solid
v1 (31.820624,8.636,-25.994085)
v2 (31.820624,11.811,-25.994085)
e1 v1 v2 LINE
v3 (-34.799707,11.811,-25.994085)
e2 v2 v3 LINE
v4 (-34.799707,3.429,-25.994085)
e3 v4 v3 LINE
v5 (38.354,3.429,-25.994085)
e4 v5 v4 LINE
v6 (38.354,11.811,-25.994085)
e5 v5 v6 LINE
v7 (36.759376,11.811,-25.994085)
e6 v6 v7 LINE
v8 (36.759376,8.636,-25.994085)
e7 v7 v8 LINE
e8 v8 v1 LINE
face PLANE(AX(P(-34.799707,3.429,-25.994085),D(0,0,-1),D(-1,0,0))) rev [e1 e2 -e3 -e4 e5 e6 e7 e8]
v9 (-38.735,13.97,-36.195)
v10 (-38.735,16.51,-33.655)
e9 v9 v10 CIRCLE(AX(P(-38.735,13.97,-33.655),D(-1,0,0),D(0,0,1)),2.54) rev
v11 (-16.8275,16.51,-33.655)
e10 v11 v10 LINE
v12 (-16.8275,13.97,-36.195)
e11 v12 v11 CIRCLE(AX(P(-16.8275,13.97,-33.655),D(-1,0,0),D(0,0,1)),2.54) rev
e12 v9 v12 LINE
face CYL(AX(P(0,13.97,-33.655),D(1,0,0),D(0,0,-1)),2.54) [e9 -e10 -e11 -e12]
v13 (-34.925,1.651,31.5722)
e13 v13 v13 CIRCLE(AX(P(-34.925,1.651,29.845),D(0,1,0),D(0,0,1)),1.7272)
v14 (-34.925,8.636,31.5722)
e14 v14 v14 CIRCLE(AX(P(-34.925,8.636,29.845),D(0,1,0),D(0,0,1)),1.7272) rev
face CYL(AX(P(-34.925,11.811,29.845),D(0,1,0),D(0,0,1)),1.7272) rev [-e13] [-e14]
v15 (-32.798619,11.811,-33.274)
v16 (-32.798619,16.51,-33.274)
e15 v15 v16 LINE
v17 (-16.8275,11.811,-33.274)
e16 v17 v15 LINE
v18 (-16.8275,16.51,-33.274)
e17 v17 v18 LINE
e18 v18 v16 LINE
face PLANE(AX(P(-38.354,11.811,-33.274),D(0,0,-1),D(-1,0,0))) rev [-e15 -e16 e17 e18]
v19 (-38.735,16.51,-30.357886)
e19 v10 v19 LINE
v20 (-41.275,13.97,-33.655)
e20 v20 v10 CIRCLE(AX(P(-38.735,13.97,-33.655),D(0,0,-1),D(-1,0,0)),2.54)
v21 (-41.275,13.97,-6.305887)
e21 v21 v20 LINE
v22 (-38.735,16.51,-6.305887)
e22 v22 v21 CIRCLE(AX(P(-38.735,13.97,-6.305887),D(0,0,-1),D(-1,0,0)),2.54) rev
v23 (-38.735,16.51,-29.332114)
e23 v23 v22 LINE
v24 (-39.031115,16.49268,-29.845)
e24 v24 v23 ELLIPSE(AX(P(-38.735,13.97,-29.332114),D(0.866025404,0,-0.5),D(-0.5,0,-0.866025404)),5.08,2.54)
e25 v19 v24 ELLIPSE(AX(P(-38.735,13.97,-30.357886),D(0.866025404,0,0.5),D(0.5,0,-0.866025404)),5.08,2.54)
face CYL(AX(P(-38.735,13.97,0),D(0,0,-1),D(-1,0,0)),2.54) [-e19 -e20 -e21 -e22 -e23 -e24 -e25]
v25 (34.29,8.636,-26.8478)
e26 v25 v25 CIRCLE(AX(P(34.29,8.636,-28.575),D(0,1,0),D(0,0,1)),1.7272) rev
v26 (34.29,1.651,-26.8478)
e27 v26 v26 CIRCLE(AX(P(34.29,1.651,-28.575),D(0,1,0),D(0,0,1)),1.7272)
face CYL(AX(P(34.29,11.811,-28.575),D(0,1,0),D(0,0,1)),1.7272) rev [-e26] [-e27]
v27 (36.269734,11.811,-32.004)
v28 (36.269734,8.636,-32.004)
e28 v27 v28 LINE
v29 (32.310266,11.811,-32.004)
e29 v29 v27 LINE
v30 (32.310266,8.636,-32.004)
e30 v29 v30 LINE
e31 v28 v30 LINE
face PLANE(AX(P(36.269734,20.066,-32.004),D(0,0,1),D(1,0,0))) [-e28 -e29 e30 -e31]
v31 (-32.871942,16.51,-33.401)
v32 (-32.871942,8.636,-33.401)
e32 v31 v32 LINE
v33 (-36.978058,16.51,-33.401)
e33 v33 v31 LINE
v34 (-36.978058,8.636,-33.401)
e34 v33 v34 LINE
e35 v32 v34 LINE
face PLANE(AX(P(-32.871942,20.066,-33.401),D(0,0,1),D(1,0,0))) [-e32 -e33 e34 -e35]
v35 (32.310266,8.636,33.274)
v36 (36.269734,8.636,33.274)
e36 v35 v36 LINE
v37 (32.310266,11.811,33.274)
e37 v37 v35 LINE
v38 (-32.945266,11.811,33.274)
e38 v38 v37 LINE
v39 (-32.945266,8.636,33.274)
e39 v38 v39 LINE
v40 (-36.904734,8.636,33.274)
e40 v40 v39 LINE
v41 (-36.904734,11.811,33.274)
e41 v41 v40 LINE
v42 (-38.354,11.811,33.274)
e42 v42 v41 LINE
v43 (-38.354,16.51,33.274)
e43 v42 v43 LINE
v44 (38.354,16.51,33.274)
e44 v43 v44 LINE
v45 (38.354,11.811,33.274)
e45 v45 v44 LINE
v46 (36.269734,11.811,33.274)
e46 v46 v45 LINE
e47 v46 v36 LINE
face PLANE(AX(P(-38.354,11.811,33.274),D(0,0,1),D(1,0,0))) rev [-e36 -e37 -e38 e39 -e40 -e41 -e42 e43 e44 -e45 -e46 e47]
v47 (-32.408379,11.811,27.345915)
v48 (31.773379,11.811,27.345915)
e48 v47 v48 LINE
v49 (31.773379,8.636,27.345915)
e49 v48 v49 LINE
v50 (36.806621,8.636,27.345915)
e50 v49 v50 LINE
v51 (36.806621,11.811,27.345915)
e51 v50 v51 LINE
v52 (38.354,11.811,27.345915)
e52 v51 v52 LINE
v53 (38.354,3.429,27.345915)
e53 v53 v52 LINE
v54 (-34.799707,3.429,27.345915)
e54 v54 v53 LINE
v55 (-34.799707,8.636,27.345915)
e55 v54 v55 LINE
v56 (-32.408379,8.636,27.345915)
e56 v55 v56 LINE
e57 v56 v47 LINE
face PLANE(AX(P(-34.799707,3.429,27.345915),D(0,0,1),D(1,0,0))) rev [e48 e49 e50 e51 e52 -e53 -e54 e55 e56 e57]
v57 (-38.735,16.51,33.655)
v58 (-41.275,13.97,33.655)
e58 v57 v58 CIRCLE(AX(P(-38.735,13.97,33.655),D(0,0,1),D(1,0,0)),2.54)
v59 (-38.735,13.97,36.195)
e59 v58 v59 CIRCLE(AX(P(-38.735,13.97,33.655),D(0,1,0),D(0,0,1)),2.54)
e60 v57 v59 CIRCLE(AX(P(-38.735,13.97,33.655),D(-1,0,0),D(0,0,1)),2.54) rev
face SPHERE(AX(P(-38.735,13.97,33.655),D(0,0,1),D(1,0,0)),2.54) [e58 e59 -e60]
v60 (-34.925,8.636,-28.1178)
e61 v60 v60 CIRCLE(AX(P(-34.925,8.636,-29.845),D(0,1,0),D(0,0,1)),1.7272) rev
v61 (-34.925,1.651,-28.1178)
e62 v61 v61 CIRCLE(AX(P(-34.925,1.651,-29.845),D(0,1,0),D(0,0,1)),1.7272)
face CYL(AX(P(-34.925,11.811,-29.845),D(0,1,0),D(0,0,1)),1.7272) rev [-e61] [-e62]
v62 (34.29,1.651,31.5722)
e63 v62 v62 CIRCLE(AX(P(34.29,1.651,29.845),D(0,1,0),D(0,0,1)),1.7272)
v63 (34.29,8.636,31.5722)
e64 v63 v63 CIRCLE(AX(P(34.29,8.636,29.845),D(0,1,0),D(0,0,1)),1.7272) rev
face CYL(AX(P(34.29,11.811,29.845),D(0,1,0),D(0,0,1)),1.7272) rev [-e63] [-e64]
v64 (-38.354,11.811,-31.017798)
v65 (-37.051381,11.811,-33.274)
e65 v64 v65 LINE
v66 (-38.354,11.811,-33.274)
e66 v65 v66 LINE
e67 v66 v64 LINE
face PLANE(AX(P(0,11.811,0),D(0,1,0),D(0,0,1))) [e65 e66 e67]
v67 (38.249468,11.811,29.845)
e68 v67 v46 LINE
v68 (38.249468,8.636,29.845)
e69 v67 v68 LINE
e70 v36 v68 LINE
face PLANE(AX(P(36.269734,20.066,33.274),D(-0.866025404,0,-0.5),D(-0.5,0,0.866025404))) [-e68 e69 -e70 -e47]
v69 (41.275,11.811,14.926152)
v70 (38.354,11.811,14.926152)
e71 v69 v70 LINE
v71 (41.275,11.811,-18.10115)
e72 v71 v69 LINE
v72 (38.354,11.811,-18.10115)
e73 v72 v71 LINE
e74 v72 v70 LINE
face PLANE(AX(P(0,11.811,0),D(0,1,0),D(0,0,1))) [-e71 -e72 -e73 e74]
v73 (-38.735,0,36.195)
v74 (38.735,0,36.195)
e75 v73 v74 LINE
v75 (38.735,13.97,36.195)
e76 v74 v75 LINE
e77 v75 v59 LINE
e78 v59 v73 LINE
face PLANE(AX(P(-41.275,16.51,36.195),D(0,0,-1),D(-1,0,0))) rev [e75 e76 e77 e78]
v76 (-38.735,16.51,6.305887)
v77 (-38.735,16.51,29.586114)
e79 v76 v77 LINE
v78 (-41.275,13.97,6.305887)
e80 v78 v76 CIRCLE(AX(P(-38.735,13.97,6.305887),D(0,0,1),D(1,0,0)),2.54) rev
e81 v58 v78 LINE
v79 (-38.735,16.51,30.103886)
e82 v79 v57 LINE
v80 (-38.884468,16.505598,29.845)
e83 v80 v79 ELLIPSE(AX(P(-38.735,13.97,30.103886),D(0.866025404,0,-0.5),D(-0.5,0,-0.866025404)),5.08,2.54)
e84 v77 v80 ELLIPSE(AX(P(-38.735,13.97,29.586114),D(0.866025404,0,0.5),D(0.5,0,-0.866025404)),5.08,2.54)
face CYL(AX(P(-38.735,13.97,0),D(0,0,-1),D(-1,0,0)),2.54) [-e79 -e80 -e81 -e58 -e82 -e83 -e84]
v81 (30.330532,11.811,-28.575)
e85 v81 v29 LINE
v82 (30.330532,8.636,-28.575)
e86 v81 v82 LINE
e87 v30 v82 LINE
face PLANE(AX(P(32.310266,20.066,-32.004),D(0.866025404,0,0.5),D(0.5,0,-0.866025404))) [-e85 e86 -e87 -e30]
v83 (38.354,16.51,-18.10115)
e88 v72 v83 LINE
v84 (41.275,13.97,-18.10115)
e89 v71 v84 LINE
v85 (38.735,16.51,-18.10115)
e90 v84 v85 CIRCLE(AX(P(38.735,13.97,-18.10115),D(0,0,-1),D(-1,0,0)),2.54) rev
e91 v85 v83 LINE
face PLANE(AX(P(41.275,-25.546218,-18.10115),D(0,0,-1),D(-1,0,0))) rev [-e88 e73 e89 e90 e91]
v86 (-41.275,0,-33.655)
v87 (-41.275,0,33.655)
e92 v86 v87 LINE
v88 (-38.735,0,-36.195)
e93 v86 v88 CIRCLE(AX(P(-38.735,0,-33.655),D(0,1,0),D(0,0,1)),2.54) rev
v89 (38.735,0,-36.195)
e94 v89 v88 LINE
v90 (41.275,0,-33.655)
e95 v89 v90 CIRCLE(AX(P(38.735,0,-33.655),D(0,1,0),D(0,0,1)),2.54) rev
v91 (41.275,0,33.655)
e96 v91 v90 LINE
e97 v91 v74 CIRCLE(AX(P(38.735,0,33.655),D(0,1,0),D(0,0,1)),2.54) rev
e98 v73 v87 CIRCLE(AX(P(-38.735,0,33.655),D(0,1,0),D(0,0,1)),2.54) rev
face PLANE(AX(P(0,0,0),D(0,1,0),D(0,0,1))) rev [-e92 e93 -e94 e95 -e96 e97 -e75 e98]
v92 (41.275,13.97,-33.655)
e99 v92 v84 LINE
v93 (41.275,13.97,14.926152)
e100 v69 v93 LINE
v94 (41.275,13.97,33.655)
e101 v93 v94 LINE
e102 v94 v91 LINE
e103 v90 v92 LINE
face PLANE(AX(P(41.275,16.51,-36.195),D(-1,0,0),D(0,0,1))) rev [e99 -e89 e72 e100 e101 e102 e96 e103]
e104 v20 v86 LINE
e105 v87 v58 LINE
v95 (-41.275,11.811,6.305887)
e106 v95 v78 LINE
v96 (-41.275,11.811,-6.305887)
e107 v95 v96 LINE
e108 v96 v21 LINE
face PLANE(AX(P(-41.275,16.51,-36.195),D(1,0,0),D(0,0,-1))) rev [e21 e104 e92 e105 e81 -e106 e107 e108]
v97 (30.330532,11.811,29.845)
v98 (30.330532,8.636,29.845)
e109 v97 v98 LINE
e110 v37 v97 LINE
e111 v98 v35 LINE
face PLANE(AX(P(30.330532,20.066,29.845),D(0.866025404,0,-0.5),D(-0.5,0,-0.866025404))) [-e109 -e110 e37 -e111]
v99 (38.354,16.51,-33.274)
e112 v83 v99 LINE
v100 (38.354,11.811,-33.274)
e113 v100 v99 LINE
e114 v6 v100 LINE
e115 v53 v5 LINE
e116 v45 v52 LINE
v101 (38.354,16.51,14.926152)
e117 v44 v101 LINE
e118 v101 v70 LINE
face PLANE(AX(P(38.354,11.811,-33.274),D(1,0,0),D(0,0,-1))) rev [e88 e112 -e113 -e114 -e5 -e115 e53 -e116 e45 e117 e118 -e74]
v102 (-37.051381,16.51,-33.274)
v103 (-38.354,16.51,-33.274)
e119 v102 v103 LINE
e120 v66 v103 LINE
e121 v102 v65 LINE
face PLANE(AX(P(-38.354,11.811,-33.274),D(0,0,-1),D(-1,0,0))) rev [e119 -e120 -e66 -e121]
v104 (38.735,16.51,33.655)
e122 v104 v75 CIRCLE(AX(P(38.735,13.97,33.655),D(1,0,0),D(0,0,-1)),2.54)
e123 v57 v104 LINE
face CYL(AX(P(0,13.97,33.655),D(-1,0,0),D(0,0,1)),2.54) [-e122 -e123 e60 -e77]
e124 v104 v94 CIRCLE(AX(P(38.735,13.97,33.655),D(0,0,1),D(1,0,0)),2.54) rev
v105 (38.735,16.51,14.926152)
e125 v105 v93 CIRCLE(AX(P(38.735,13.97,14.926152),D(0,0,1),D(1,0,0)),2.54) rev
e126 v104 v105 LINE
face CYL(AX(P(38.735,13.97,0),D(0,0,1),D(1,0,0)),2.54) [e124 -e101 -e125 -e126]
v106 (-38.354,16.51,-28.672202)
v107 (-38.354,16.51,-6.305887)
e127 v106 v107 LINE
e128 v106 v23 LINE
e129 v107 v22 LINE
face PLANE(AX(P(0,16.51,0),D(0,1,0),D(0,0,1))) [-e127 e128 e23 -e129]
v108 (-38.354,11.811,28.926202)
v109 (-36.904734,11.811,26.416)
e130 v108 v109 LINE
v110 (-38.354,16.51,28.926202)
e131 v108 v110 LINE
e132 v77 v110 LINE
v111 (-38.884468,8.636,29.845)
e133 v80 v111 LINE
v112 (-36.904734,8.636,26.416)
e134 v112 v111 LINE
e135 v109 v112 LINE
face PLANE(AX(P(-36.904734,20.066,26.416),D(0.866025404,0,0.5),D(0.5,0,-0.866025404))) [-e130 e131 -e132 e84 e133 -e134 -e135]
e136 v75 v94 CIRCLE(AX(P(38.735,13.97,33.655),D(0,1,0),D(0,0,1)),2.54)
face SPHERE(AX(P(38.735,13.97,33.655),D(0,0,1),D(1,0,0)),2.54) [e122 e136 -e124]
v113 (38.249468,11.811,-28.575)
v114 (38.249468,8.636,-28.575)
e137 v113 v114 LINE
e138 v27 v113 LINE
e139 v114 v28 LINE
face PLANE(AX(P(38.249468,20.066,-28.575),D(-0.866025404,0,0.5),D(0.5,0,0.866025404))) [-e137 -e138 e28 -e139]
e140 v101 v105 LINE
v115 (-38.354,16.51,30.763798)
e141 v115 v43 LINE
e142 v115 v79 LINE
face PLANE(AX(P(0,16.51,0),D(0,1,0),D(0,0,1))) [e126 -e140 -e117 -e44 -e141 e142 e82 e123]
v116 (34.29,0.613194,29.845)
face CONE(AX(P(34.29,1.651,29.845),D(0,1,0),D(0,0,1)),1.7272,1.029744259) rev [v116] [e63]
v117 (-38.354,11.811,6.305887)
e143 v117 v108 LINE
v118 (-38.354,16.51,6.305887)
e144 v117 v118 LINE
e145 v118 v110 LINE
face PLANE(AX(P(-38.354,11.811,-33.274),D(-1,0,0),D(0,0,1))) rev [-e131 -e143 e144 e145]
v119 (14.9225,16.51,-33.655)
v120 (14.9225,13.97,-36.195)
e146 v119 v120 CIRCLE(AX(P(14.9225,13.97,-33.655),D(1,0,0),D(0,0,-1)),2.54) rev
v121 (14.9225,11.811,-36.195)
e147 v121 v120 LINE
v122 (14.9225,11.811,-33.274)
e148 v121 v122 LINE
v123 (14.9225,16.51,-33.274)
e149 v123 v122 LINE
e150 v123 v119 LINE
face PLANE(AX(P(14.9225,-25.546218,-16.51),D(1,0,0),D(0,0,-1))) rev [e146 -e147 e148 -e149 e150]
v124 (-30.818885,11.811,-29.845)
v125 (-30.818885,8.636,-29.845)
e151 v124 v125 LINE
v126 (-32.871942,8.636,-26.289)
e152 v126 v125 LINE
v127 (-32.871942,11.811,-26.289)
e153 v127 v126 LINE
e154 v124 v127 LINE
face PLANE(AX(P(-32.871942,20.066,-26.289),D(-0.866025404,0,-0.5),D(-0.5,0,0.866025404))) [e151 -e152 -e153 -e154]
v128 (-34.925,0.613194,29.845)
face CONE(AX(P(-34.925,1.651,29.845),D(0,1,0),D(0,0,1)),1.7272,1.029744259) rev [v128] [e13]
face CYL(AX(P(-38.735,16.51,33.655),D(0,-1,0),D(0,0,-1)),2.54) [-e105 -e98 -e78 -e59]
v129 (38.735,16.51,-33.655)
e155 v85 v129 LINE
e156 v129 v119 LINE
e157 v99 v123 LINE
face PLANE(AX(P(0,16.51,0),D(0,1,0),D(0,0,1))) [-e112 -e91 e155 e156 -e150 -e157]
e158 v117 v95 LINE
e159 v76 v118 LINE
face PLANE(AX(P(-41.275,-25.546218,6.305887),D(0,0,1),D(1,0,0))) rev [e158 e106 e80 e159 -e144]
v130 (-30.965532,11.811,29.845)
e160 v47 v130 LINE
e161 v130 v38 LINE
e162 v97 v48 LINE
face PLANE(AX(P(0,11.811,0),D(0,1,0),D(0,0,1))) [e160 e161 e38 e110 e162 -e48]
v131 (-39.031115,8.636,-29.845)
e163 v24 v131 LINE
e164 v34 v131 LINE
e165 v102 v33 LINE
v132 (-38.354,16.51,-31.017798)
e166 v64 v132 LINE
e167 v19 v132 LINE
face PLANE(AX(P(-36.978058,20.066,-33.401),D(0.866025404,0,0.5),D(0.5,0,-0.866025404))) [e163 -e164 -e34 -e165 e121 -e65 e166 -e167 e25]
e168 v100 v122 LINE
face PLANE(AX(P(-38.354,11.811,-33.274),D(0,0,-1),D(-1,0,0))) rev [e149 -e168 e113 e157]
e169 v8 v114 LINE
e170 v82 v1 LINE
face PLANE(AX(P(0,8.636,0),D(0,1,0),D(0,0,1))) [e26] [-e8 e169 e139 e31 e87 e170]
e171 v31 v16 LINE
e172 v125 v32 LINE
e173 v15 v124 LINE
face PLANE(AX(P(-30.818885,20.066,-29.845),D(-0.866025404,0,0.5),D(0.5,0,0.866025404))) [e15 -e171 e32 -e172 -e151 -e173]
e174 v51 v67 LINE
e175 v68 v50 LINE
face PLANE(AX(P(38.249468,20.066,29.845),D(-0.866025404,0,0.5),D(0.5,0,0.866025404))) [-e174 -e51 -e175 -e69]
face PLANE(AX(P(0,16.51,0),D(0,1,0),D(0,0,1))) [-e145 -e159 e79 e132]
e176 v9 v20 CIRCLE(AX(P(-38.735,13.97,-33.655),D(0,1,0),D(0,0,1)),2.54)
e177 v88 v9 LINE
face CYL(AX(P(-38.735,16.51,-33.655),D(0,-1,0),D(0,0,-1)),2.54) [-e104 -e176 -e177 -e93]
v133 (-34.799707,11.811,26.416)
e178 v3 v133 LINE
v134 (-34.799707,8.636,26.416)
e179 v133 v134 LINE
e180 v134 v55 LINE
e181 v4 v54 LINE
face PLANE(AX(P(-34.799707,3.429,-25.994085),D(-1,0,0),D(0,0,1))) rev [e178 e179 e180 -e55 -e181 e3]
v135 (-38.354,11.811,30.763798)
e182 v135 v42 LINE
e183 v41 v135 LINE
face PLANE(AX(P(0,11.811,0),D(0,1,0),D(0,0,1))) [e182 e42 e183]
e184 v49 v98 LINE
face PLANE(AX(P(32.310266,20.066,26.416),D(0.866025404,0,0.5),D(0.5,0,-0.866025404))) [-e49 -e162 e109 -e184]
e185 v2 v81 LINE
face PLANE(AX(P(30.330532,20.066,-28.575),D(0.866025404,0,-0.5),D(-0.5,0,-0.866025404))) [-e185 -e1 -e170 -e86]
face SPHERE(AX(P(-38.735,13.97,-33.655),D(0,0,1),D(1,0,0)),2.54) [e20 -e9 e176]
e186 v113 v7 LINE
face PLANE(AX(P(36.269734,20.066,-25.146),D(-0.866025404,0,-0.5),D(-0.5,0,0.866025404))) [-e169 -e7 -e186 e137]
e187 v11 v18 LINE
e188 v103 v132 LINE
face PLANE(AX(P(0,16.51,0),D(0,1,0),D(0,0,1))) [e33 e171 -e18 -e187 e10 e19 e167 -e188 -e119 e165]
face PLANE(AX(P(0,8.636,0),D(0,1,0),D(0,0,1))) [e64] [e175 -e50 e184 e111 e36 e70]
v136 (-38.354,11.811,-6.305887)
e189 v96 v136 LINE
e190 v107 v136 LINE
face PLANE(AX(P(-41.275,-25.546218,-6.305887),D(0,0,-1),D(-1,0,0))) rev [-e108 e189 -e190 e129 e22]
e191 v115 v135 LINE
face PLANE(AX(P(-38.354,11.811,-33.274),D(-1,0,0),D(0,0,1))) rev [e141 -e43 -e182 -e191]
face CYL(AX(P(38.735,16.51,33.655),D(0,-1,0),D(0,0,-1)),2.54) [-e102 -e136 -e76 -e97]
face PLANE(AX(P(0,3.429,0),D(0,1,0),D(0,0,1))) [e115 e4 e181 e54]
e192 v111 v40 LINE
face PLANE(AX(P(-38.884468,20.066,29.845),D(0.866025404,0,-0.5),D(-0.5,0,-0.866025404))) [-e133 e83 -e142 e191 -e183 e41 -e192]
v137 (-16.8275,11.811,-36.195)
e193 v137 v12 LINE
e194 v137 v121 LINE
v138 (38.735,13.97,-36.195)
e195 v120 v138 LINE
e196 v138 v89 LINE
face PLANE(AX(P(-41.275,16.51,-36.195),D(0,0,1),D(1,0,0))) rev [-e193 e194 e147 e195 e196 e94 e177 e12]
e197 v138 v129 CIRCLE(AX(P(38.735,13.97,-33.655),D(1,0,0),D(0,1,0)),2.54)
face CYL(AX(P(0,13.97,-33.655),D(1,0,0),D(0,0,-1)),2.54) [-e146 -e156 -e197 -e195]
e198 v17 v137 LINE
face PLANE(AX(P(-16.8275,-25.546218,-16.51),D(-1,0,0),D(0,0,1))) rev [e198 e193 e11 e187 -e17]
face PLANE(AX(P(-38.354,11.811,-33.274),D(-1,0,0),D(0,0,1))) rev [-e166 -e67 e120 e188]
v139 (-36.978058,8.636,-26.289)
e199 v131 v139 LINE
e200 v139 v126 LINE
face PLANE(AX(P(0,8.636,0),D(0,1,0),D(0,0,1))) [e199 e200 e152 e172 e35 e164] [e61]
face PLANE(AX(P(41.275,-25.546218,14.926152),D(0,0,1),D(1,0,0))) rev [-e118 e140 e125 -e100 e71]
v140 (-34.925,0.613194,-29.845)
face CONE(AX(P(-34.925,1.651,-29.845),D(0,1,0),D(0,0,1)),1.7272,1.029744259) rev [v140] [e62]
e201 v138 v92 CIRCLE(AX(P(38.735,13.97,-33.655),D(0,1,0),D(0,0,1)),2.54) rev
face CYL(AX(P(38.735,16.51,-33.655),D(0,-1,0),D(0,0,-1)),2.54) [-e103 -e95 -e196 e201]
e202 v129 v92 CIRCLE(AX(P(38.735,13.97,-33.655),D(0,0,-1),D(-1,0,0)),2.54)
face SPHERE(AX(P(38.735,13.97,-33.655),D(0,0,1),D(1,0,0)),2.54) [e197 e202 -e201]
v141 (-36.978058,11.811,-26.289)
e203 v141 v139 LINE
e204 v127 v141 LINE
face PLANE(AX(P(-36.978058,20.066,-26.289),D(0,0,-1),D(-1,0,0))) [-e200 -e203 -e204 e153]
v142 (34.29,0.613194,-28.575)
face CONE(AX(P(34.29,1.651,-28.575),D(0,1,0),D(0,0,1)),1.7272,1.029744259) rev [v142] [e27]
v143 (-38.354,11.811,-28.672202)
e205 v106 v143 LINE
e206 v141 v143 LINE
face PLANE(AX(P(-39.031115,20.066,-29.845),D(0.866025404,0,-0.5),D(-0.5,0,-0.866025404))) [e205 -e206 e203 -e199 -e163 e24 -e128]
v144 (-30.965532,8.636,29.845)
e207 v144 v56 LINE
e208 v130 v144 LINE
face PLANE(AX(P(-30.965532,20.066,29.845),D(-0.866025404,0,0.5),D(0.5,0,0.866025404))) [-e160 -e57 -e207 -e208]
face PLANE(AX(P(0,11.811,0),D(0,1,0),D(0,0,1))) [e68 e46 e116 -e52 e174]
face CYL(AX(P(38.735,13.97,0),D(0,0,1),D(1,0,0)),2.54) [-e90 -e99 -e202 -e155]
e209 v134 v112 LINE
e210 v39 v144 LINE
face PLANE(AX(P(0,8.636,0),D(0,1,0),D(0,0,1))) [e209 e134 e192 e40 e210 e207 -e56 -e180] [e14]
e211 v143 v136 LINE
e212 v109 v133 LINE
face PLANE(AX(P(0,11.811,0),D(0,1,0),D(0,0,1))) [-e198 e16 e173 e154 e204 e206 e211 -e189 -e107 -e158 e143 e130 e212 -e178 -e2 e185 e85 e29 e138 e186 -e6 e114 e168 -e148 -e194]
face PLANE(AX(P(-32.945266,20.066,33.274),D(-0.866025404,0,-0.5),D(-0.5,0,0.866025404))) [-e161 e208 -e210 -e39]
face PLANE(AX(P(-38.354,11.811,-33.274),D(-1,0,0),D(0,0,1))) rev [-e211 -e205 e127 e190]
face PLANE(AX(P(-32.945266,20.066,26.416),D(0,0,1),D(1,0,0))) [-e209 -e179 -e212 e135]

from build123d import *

# Parameters (mm, degrees)
SKETCH1_W                 = 82.55
SKETCH1_H                 = 72.39
BOSS_EXTRUDE1_DEPTH       = 16.51
SKETCH3_W                 = 76.708
SKETCH3_H                 = 66.548
CUT_EXTRUDE1_DEPTH        = 4.699
F_4_CLEARANCE_HOLE1_D     = 3.4544
F_4_CLEARANCE_HOLE1_DEPTH = 10.16
F_4_CLEARANCE_HOLE1_TIP   = 1.037806461
CUT_EXTRUDE2_DEPTH        = 8.255
CUT_EXTRUDE2_DEPTH_BACK   = 3.175
SKETCH9_W                 = 73.153706622
SKETCH9_H                 = 53.34
CUT_EXTRUDE3_DEPTH        = 8.382
SKETCH12_W                = 10.829569732
SKETCH12_H                = 12.611774214
SKETCH12_W_2              = 17.214227743
SKETCH12_H_2              = 33.027302542
SKETCH12_W_3              = 31.75
SKETCH12_H_3              = 19.685
CUT_EXTRUDE8_DEPTH        = 4.699
FILLET1_R                 = 2.54


with BuildPart() as part:
    # Sketch1 → Boss-Extrude1 (new body)
    with BuildSketch(Plane(origin=(0, 0, 0), x_dir=(1, 0, 0), z_dir=(0, 1, 0))):
        Rectangle(SKETCH1_W, SKETCH1_H)
    extrude(amount=BOSS_EXTRUDE1_DEPTH)

    # Sketch3 → Cut-Extrude1 (cut)
    with BuildSketch(Plane(origin=(0, 16.51, 0), x_dir=(1, 0, 0), z_dir=(0, 1, 0))):
        Rectangle(SKETCH3_W, SKETCH3_H)
    extrude(amount=-CUT_EXTRUDE1_DEPTH, mode=Mode.SUBTRACT)

    # #4 Clearance Hole1
    with Locations(Plane(origin=(0, 11.811, 0), x_dir=(1, 0, 0), z_dir=(0, 1, 0))):
        with Locations((-34.925, 29.845), (34.29, 28.575), (34.29, -29.845), (-34.925, -29.845)):
            Hole(F_4_CLEARANCE_HOLE1_D / 2, depth=F_4_CLEARANCE_HOLE1_DEPTH)
            with Locations((0, 0, -(F_4_CLEARANCE_HOLE1_DEPTH + F_4_CLEARANCE_HOLE1_TIP / 2))):  # 118° drill point
                Cone(0, F_4_CLEARANCE_HOLE1_D / 2, F_4_CLEARANCE_HOLE1_TIP, mode=Mode.SUBTRACT)

    # Sketch8 → Cut-Extrude2 (cut, two sides: drawn at the far end of the back side and taken through both)
    with BuildSketch(Plane(origin=(0, 11.811, 0), x_dir=(1, 0, 0), z_dir=(0, 1, 0)).offset(-CUT_EXTRUDE2_DEPTH_BACK)):
        Polygon((38.249468146, -29.845), (36.269734073, -26.416), (32.310265927, -26.416), (30.330531854, -29.845), (32.310265927, -33.274), (36.269734073, -33.274), align=None)
        Polygon((-30.818884886, 29.845), (-32.871942443, 33.401), (-36.978057557, 33.401), (-39.031115114, 29.845), (-36.978057557, 26.289), (-32.871942443, 26.289), align=None)
        Polygon((38.249468146, 28.575), (36.269734073, 32.004), (32.310265927, 32.004), (30.330531854, 28.575), (32.310265927, 25.146), (36.269734073, 25.146), align=None)
        Polygon((-30.965531854, -29.845), (-32.945265927, -26.416), (-36.904734073, -26.416), (-38.884468146, -29.845), (-36.904734073, -33.274), (-32.945265927, -33.274), align=None)
    extrude(amount=CUT_EXTRUDE2_DEPTH + CUT_EXTRUDE2_DEPTH_BACK, mode=Mode.SUBTRACT)

    # Sketch9 → Cut-Extrude3 (cut)
    with BuildSketch(Plane(origin=(0, 11.811, 0), x_dir=(1, 0, 0), z_dir=(0, 1, 0))):
        with Locations((1.777146689, -0.675914663)):
            Rectangle(SKETCH9_W, SKETCH9_H)
    extrude(amount=-CUT_EXTRUDE3_DEPTH, mode=Mode.SUBTRACT)

    # Sketch12 → Cut-Extrude8 (cut)
    with BuildSketch(Plane(origin=(0, 16.51, 0), x_dir=(1, 0, 0), z_dir=(0, 1, 0))):
        with Locations((-35.860215134, 0)):
            Rectangle(SKETCH12_W, SKETCH12_H)
        with Locations((32.667886129, 1.587498929)):
            Rectangle(SKETCH12_W_2, SKETCH12_H_2)
        with Locations((-0.9525, 26.3525)):
            Rectangle(SKETCH12_W_3, SKETCH12_H_3)
    extrude(amount=-CUT_EXTRUDE8_DEPTH, mode=Mode.SUBTRACT)

    # Fillet1
    # the kernel refuses this fillet: 2.54 mm, written as the material it takes off along each edge
    with BuildSketch(Plane(origin=(38.735, 13.97, 33.655), x_dir=(0, 1, 0), z_dir=(0, 0, 1))) as fillet1_piece_1_section:
        Polygon((0, 0), (FILLET1_R, 0), (FILLET1_R, -FILLET1_R), (0, -FILLET1_R), align=None)
    fillet1_piece_1 = extrude(amount=FILLET1_R, mode=Mode.PRIVATE)
    fillet1_piece_1 = fillet1_piece_1 - Plane(origin=(38.735, 13.97, 33.655), x_dir=(-0.7071067811865475, -0.7071067811865475, 0), z_dir=(0, 0, 1)) * Sphere(FILLET1_R, mode=Mode.PRIVATE)
    add(fillet1_piece_1, mode=Mode.SUBTRACT)
    with BuildSketch(Plane(origin=(38.735, 13.97, -33.655), x_dir=(0, 1, 0), z_dir=(0, 0, -1))) as fillet1_piece_2_section:
        Polygon((0, 0), (FILLET1_R, 0), (FILLET1_R, FILLET1_R), (0, FILLET1_R), align=None)
    fillet1_piece_2 = extrude(amount=FILLET1_R, mode=Mode.PRIVATE)
    fillet1_piece_2 = fillet1_piece_2 - Plane(origin=(38.735, 13.97, -33.655), x_dir=(-0.7071067811865475, -0.7071067811865475, 0), z_dir=(0, 0, -1)) * Sphere(FILLET1_R, mode=Mode.PRIVATE)
    add(fillet1_piece_2, mode=Mode.SUBTRACT)
    with BuildSketch(Plane(origin=(-38.735, 13.97, 33.655), x_dir=(0, 0, 1), z_dir=(-1, 0, 0))) as fillet1_piece_3_section:
        Polygon((0, 0), (FILLET1_R, 0), (FILLET1_R, FILLET1_R), (0, FILLET1_R), align=None)
    fillet1_piece_3 = extrude(amount=FILLET1_R, mode=Mode.PRIVATE)
    fillet1_piece_3 = fillet1_piece_3 - Plane(origin=(-38.735, 13.97, 33.655), x_dir=(0, -0.7071067811865475, -0.7071067811865475), z_dir=(-1, 0, 0)) * Sphere(FILLET1_R, mode=Mode.PRIVATE)
    add(fillet1_piece_3, mode=Mode.SUBTRACT)
    with BuildSketch(Plane(origin=(-38.735, 13.97, -33.655), x_dir=(-1, 0, 0), z_dir=(0, 0, -1))) as fillet1_piece_4_section:
        Polygon((0, 0), (FILLET1_R, 0), (FILLET1_R, FILLET1_R), (0, FILLET1_R), align=None)
    fillet1_piece_4 = extrude(amount=FILLET1_R, mode=Mode.PRIVATE)
    fillet1_piece_4 = fillet1_piece_4 - Plane(origin=(-38.735, 13.97, -33.655), x_dir=(0.7071067811865475, -0.7071067811865475, 0), z_dir=(0, 0, -1)) * Sphere(FILLET1_R, mode=Mode.PRIVATE)
    add(fillet1_piece_4, mode=Mode.SUBTRACT)
    with BuildSketch(Plane(origin=(41.275, 16.51, 8.576152342), x_dir=(-1, 0, 0), z_dir=(0, 0, 1))) as fillet1_piece_5:
        with BuildLine():
            CenterArc((FILLET1_R, FILLET1_R), FILLET1_R, 180, 90)
            Line((0, FILLET1_R), (0, 0))
            Line((0, 0), (FILLET1_R, 0))
        make_face()
    extrude(amount=25.078847658, mode=Mode.SUBTRACT)
    with BuildSketch(Plane(origin=(8.5725, 16.51, -36.195), x_dir=(0, -1, 0), z_dir=(1, 0, 0))) as fillet1_piece_6:
        with BuildLine():
            CenterArc((FILLET1_R, -FILLET1_R), FILLET1_R, 90, 90)
            Line((0, -FILLET1_R), (0, 0))
            Line((0, 0), (FILLET1_R, 0))
        make_face()
    extrude(amount=30.1625, mode=Mode.SUBTRACT)
    with BuildSketch(Plane(origin=(-41.275, 16.51, 33.655), x_dir=(0, -1, 0), z_dir=(0, 0, -1)), Plane(origin=(-41.275, 16.51, 0.044112893), x_dir=(0, -1, 0), z_dir=(0, 0, -1))) as fillet1_piece_7:
        with BuildLine():
            CenterArc((FILLET1_R, -FILLET1_R), FILLET1_R, 90, 90)
            Line((0, -FILLET1_R), (0, 0))
            Line((0, 0), (FILLET1_R, 0))
        make_face()
    extrude(amount=33.699112893, mode=Mode.SUBTRACT)
    with BuildSketch(Plane(origin=(41.275, 16.51, -33.655), x_dir=(-1, 0, 0), z_dir=(0, 0, 1))) as fillet1_piece_8:
        with BuildLine():
            CenterArc((FILLET1_R, FILLET1_R), FILLET1_R, 180, 90)
            Line((0, FILLET1_R), (0, 0))
            Line((0, 0), (FILLET1_R, 0))
        make_face()
    extrude(amount=21.9038498, mode=Mode.SUBTRACT)
    with BuildSketch(Plane(origin=(-38.735, 16.51, -36.195), x_dir=(0, -1, 0), z_dir=(1, 0, 0))) as fillet1_piece_9:
        with BuildLine():
            CenterArc((FILLET1_R, -FILLET1_R), FILLET1_R, 90, 90)
            Line((0, -FILLET1_R), (0, 0))
            Line((0, 0), (FILLET1_R, 0))
        make_face()
    extrude(amount=28.2575, mode=Mode.SUBTRACT)
    with BuildSketch(Plane(origin=(38.735, 16.51, 36.195), x_dir=(0, -1, 0), z_dir=(-1, 0, 0))) as fillet1_piece_10:
        with BuildLine():
            CenterArc((FILLET1_R, -FILLET1_R), FILLET1_R, 90, 90)
            Line((0, -FILLET1_R), (0, 0))
            Line((0, 0), (FILLET1_R, 0))
        make_face()
    extrude(amount=77.47, mode=Mode.SUBTRACT)
    with BuildSketch(Plane(origin=(-41.275, -6.35, -36.195), x_dir=(1, 0, 0), z_dir=(0, 1, 0)), Plane(origin=(41.275, -6.35, 36.195), x_dir=(-1, 0, 0), z_dir=(0, 1, 0)), Plane(origin=(-41.275, -6.35, 36.195), x_dir=(0, 0, -1), z_dir=(0, 1, 0))) as fillet1_piece_11:
        with BuildLine():
            CenterArc((FILLET1_R, -FILLET1_R), FILLET1_R, 90, 90)
            Line((0, -FILLET1_R), (0, 0))
            Line((0, 0), (FILLET1_R, 0))
        make_face()
    extrude(amount=20.32, mode=Mode.SUBTRACT)
    with BuildSketch(Plane(origin=(41.275, -6.35, -36.195), x_dir=(-1, 0, 0), z_dir=(0, 1, 0))) as fillet1_piece_12:
        with BuildLine():
            CenterArc((FILLET1_R, FILLET1_R), FILLET1_R, 180, 90)
            Line((0, FILLET1_R), (0, 0))
            Line((0, 0), (FILLET1_R, 0))
        make_face()
    extrude(amount=20.32, mode=Mode.SUBTRACT)


solid = part.part
